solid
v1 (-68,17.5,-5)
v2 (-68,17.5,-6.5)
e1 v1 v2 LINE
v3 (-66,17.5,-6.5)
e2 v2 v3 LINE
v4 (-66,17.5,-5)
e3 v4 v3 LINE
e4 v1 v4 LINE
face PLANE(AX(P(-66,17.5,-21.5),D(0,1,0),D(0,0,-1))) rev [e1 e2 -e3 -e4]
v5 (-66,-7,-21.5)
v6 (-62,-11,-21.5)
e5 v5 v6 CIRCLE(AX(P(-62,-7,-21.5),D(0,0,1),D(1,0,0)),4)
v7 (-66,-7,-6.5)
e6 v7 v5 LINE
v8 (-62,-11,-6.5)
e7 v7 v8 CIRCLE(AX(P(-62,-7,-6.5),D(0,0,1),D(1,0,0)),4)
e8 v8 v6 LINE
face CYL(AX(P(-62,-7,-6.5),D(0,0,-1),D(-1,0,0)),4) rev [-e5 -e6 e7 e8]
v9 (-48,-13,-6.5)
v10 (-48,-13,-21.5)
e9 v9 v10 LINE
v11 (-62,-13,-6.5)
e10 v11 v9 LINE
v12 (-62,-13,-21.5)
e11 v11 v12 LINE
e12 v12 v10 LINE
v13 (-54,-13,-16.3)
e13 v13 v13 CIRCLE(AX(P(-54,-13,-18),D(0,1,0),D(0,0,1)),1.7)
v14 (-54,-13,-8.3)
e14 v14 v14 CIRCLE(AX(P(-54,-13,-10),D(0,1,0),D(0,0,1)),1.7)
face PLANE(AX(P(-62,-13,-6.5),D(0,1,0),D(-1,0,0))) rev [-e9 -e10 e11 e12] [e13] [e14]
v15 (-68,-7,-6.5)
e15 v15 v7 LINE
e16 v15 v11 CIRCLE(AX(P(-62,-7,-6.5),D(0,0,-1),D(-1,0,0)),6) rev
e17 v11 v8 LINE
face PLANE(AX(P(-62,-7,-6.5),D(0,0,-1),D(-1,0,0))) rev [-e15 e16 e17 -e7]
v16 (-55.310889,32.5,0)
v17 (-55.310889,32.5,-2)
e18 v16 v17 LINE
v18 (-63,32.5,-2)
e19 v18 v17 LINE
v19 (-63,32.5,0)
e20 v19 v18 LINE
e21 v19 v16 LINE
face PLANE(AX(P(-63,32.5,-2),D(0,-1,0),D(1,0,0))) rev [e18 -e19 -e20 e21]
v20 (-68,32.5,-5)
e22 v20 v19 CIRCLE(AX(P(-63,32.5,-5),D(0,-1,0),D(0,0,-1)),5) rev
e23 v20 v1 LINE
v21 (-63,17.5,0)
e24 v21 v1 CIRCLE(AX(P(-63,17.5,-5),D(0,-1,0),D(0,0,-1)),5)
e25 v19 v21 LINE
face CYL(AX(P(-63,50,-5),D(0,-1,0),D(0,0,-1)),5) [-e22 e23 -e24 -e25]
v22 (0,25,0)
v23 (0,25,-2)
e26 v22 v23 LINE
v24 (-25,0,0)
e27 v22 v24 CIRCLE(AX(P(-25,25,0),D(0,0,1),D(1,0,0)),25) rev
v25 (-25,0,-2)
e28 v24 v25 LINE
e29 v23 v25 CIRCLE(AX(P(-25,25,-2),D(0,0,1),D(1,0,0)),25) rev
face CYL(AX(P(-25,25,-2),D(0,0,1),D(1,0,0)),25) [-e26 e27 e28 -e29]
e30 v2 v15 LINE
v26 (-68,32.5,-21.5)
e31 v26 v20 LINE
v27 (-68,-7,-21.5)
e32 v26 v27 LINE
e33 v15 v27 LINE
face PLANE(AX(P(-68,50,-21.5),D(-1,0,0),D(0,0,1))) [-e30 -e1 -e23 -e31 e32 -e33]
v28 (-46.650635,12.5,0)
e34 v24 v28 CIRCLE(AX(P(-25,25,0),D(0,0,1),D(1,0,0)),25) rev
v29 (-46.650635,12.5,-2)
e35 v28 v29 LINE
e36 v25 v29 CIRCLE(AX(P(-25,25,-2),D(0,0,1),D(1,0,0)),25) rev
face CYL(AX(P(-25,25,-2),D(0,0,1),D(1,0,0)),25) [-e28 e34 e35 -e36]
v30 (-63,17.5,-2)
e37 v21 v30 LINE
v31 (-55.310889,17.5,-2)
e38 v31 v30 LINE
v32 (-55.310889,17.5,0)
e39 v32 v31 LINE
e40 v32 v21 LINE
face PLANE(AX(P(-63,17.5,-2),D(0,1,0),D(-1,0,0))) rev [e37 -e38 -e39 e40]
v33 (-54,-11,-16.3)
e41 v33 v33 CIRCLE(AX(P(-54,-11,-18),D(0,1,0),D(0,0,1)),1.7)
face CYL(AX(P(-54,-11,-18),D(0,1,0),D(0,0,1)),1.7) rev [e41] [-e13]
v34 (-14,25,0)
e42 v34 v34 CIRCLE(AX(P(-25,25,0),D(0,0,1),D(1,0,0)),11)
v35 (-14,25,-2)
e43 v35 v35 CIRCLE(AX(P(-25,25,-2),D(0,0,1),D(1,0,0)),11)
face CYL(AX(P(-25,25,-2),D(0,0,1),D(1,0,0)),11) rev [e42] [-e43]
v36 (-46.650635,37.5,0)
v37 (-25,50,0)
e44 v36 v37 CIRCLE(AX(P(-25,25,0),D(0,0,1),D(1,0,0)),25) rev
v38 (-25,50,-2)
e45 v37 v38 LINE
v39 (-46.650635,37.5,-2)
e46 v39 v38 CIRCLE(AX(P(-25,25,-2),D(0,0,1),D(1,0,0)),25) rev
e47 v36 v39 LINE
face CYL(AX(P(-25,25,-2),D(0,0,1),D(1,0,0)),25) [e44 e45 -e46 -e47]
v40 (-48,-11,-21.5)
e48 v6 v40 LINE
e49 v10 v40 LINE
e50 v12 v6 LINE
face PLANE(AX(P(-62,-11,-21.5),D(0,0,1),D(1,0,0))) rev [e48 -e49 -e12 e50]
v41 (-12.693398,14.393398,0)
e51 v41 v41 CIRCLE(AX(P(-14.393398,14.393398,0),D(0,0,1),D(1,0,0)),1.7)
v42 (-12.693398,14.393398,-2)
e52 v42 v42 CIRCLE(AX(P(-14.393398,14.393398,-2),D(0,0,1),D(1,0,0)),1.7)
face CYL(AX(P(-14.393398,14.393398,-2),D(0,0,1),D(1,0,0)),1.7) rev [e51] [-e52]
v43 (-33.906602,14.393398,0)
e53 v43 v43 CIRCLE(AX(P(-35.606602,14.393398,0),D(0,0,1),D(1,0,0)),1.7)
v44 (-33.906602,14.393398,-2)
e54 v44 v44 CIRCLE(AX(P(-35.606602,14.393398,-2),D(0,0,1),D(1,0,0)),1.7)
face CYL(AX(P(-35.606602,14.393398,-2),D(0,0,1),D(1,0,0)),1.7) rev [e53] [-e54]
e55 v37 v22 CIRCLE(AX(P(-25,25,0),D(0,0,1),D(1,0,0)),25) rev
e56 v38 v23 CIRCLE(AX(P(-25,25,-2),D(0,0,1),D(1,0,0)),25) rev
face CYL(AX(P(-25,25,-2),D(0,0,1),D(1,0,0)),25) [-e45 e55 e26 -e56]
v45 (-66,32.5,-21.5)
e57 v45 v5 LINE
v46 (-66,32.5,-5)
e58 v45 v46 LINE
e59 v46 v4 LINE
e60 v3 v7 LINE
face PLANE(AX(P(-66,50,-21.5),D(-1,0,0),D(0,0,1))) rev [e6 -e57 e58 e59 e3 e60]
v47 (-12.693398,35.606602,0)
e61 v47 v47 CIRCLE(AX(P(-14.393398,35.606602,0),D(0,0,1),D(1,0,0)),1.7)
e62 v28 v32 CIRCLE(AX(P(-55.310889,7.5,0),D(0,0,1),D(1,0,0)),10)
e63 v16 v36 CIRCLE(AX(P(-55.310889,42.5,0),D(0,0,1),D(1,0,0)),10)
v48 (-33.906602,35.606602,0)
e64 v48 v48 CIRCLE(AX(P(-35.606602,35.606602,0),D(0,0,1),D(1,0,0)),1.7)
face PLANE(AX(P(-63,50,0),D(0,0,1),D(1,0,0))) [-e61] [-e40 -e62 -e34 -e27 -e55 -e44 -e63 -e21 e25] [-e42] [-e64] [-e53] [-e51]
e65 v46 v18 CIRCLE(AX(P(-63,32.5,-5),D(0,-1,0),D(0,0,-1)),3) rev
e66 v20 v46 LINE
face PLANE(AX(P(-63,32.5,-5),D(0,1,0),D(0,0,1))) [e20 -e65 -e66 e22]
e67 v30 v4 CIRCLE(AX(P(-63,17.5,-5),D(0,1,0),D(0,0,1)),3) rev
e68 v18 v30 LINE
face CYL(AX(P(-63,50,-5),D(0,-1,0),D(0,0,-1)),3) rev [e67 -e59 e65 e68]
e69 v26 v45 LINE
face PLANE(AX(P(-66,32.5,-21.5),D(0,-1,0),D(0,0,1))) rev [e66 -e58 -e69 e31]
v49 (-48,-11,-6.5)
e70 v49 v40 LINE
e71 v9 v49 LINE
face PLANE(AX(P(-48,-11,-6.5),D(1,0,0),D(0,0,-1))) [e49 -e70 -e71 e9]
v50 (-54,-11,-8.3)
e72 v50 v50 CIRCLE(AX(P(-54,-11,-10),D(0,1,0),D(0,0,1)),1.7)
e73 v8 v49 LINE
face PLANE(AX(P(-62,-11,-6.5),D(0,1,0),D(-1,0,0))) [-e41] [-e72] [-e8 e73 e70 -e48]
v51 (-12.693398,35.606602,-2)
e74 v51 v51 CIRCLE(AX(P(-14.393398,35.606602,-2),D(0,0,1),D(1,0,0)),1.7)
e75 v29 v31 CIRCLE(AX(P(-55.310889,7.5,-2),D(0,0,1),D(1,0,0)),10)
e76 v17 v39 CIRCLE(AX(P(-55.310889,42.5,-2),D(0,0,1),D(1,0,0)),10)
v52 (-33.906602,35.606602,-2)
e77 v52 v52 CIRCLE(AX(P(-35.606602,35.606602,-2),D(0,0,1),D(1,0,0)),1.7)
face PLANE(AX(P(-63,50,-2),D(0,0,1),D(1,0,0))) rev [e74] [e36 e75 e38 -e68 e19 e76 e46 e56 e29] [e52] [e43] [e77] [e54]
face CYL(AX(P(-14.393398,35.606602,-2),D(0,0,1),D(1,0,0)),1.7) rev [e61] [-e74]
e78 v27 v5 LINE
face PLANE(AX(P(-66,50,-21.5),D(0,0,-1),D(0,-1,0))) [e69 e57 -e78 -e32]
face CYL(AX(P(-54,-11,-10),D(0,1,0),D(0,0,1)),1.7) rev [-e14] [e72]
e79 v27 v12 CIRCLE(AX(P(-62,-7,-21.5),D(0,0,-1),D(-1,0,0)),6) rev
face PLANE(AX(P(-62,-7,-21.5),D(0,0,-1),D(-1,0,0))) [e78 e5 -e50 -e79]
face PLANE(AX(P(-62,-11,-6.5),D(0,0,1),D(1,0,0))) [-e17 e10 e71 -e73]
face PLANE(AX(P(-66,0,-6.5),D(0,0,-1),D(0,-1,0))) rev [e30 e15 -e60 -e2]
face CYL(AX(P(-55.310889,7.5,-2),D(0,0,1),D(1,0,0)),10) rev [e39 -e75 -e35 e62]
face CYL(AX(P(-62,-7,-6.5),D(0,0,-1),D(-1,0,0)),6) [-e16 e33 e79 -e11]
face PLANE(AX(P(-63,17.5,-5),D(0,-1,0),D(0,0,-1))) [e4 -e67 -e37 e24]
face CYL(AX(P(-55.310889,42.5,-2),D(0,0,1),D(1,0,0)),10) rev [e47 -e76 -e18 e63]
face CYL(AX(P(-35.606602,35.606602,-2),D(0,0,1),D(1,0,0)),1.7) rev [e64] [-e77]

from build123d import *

# Parameters (mm, degrees)
BOSS_EXTRUDE1_DEPTH  = 50
SKETCH4_R            = 11
CUT_EXTRUDE1_DEPTH   = 88.099081511
BOSS_EXTRUDE2_DEPTH  = 15
M3_CLEARANCE_HOLE2_D = 3.4
CUT_EXTRUDE2_START   = -6.5
CUT_EXTRUDE2_DEPTH   = 6.5
CUT_EXTRUDE3_START   = -21.5
CUT_EXTRUDE3_DEPTH   = 21.5
FILLET1_R            = 25
FILLET2_R            = 10
CONVERT_SOLID1_START = -21.5
CONVERT_SOLID1_DEPTH = 15
M3_CLEARANCE_HOLE3_D = 3.4


# Read off the part's stored shape, not the designer's step: Convert-Solid1
with BuildPart() as part:
    # Sketch2 → Boss-Extrude1 (new body)
    with BuildSketch(Plane(origin=(0, 0, 0), x_dir=(1, 0, 0), z_dir=(0, 1, 0))):
        with BuildLine():
            Line((0, 0), (-63, 0))
            ThreePointArc((-63, 0), (-66.535533906, 1.464466094), (-68, 5))
            Line((-68, 5), (-68, 21.5))
            Line((-68, 21.5), (-66, 21.5))
            Line((-66, 21.5), (-66, 5))
            ThreePointArc((-66, 5), (-65.121320344, 2.878679656), (-63, 2))
            Line((-63, 2), (0, 2))
            Line((0, 2), (0, 0))
        make_face()
    extrude(amount=BOSS_EXTRUDE1_DEPTH)

    # Sketch4 → Cut-Extrude1 (cut, through all)
    with BuildSketch(Plane.XY):
        with Locations((-25, 25)):
            Circle(SKETCH4_R)
    extrude(amount=-CUT_EXTRUDE1_DEPTH, mode=Mode.SUBTRACT)

    # Sketch3 → Boss-Extrude2 (add)
    with BuildSketch(Plane(origin=(0, 0, -21.5), x_dir=(-1, 0, 0), z_dir=(0, 0, -1))):
        with BuildLine():
            Line((66, 0), (66, -7))
            ThreePointArc((66, -7), (64.828427125, -9.828427125), (62, -11))
            Line((62, -11), (48, -11))
            Line((48, -11), (48, -13))
            Line((48, -13), (63, -13))
            ThreePointArc((63, -13), (66.535533906, -11.535533906), (68, -8))
            Line((68, -8), (68, 0))
            Line((68, 0), (66, 0))
        make_face()
    extrude(amount=-BOSS_EXTRUDE2_DEPTH)

    # M3 Clearance Hole2 (through all)
    with Locations(Plane.XY):
        with Locations((-35.606601718, 14.393398282), (-35.606601718, 35.606601718), (-14.393398282, 35.606601718), (-14.393398282, 14.393398282)):
            Hole(M3_CLEARANCE_HOLE2_D / 2)

    # Sketch8 → Cut-Extrude2 (cut)
    with BuildSketch(Plane.XY.offset(CUT_EXTRUDE2_START)):
        with BuildLine():
            Line((-25, 0), (-68, 0))
            Line((-68, 0), (-68, 17.5))
            Line((-68, 17.5), (-48.848480035, 17.5))
            ThreePointArc((-48.848480035, 17.5), (-39.790199458, 4.844355629), (-25, 0))
        make_face()
    extrude(amount=CUT_EXTRUDE2_DEPTH, mode=Mode.SUBTRACT)

    # Sketch9 → Cut-Extrude3 (cut)
    with BuildSketch(Plane.XY.offset(CUT_EXTRUDE3_START)):
        with BuildLine():
            Line((-25, 50), (-68, 50))
            Line((-68, 50), (-68, 32.5))
            Line((-68, 32.5), (-48.848480035, 32.5))
            ThreePointArc((-48.848480035, 32.5), (-39.790199458, 45.155644371), (-25, 50))
        make_face()
    extrude(amount=CUT_EXTRUDE3_DEPTH, mode=Mode.SUBTRACT)

    # Fillet1
    fillet1_edges = [part.edges().sort_by_distance(p)[0] for p in [
        (0, 0, -1),
        (0, 50, -1),
    ]]
    fillet(fillet1_edges, radius=FILLET1_R - 0.0001)  # a hair under: the kernel refuses the full size

    # Fillet2
    fillet2_edges = [part.edges().sort_by_distance(p)[0] for p in [
        (-48.848480035, 32.5, -1),
        (-48.848480035, 17.5, -1),
    ]]
    fillet(fillet2_edges, radius=FILLET2_R)

    # Convert-Solid1 outline → Convert-Solid1 (cut)
    with BuildSketch(Plane.XY.offset(CONVERT_SOLID1_START)):
        with BuildLine():
            Line((-63, -13), (-62, -13))
            ThreePointArc((-62, -13), (-66.242640687, -11.242640687), (-68, -7))
            Line((-68, -7), (-68, -8))
            ThreePointArc((-68, -8), (-66.535533906, -11.535533906), (-63, -13))
        make_face()
    extrude(amount=CONVERT_SOLID1_DEPTH, mode=Mode.SUBTRACT)

    # M3 Clearance Hole3 (through all)
    with Locations(Plane(origin=(0, -11, 0), x_dir=(1, 0, 0), z_dir=(0, 1, 0))):
        with Locations((-54, 10), (-54, 18)):
            Hole(M3_CLEARANCE_HOLE3_D / 2)


solid = part.part
